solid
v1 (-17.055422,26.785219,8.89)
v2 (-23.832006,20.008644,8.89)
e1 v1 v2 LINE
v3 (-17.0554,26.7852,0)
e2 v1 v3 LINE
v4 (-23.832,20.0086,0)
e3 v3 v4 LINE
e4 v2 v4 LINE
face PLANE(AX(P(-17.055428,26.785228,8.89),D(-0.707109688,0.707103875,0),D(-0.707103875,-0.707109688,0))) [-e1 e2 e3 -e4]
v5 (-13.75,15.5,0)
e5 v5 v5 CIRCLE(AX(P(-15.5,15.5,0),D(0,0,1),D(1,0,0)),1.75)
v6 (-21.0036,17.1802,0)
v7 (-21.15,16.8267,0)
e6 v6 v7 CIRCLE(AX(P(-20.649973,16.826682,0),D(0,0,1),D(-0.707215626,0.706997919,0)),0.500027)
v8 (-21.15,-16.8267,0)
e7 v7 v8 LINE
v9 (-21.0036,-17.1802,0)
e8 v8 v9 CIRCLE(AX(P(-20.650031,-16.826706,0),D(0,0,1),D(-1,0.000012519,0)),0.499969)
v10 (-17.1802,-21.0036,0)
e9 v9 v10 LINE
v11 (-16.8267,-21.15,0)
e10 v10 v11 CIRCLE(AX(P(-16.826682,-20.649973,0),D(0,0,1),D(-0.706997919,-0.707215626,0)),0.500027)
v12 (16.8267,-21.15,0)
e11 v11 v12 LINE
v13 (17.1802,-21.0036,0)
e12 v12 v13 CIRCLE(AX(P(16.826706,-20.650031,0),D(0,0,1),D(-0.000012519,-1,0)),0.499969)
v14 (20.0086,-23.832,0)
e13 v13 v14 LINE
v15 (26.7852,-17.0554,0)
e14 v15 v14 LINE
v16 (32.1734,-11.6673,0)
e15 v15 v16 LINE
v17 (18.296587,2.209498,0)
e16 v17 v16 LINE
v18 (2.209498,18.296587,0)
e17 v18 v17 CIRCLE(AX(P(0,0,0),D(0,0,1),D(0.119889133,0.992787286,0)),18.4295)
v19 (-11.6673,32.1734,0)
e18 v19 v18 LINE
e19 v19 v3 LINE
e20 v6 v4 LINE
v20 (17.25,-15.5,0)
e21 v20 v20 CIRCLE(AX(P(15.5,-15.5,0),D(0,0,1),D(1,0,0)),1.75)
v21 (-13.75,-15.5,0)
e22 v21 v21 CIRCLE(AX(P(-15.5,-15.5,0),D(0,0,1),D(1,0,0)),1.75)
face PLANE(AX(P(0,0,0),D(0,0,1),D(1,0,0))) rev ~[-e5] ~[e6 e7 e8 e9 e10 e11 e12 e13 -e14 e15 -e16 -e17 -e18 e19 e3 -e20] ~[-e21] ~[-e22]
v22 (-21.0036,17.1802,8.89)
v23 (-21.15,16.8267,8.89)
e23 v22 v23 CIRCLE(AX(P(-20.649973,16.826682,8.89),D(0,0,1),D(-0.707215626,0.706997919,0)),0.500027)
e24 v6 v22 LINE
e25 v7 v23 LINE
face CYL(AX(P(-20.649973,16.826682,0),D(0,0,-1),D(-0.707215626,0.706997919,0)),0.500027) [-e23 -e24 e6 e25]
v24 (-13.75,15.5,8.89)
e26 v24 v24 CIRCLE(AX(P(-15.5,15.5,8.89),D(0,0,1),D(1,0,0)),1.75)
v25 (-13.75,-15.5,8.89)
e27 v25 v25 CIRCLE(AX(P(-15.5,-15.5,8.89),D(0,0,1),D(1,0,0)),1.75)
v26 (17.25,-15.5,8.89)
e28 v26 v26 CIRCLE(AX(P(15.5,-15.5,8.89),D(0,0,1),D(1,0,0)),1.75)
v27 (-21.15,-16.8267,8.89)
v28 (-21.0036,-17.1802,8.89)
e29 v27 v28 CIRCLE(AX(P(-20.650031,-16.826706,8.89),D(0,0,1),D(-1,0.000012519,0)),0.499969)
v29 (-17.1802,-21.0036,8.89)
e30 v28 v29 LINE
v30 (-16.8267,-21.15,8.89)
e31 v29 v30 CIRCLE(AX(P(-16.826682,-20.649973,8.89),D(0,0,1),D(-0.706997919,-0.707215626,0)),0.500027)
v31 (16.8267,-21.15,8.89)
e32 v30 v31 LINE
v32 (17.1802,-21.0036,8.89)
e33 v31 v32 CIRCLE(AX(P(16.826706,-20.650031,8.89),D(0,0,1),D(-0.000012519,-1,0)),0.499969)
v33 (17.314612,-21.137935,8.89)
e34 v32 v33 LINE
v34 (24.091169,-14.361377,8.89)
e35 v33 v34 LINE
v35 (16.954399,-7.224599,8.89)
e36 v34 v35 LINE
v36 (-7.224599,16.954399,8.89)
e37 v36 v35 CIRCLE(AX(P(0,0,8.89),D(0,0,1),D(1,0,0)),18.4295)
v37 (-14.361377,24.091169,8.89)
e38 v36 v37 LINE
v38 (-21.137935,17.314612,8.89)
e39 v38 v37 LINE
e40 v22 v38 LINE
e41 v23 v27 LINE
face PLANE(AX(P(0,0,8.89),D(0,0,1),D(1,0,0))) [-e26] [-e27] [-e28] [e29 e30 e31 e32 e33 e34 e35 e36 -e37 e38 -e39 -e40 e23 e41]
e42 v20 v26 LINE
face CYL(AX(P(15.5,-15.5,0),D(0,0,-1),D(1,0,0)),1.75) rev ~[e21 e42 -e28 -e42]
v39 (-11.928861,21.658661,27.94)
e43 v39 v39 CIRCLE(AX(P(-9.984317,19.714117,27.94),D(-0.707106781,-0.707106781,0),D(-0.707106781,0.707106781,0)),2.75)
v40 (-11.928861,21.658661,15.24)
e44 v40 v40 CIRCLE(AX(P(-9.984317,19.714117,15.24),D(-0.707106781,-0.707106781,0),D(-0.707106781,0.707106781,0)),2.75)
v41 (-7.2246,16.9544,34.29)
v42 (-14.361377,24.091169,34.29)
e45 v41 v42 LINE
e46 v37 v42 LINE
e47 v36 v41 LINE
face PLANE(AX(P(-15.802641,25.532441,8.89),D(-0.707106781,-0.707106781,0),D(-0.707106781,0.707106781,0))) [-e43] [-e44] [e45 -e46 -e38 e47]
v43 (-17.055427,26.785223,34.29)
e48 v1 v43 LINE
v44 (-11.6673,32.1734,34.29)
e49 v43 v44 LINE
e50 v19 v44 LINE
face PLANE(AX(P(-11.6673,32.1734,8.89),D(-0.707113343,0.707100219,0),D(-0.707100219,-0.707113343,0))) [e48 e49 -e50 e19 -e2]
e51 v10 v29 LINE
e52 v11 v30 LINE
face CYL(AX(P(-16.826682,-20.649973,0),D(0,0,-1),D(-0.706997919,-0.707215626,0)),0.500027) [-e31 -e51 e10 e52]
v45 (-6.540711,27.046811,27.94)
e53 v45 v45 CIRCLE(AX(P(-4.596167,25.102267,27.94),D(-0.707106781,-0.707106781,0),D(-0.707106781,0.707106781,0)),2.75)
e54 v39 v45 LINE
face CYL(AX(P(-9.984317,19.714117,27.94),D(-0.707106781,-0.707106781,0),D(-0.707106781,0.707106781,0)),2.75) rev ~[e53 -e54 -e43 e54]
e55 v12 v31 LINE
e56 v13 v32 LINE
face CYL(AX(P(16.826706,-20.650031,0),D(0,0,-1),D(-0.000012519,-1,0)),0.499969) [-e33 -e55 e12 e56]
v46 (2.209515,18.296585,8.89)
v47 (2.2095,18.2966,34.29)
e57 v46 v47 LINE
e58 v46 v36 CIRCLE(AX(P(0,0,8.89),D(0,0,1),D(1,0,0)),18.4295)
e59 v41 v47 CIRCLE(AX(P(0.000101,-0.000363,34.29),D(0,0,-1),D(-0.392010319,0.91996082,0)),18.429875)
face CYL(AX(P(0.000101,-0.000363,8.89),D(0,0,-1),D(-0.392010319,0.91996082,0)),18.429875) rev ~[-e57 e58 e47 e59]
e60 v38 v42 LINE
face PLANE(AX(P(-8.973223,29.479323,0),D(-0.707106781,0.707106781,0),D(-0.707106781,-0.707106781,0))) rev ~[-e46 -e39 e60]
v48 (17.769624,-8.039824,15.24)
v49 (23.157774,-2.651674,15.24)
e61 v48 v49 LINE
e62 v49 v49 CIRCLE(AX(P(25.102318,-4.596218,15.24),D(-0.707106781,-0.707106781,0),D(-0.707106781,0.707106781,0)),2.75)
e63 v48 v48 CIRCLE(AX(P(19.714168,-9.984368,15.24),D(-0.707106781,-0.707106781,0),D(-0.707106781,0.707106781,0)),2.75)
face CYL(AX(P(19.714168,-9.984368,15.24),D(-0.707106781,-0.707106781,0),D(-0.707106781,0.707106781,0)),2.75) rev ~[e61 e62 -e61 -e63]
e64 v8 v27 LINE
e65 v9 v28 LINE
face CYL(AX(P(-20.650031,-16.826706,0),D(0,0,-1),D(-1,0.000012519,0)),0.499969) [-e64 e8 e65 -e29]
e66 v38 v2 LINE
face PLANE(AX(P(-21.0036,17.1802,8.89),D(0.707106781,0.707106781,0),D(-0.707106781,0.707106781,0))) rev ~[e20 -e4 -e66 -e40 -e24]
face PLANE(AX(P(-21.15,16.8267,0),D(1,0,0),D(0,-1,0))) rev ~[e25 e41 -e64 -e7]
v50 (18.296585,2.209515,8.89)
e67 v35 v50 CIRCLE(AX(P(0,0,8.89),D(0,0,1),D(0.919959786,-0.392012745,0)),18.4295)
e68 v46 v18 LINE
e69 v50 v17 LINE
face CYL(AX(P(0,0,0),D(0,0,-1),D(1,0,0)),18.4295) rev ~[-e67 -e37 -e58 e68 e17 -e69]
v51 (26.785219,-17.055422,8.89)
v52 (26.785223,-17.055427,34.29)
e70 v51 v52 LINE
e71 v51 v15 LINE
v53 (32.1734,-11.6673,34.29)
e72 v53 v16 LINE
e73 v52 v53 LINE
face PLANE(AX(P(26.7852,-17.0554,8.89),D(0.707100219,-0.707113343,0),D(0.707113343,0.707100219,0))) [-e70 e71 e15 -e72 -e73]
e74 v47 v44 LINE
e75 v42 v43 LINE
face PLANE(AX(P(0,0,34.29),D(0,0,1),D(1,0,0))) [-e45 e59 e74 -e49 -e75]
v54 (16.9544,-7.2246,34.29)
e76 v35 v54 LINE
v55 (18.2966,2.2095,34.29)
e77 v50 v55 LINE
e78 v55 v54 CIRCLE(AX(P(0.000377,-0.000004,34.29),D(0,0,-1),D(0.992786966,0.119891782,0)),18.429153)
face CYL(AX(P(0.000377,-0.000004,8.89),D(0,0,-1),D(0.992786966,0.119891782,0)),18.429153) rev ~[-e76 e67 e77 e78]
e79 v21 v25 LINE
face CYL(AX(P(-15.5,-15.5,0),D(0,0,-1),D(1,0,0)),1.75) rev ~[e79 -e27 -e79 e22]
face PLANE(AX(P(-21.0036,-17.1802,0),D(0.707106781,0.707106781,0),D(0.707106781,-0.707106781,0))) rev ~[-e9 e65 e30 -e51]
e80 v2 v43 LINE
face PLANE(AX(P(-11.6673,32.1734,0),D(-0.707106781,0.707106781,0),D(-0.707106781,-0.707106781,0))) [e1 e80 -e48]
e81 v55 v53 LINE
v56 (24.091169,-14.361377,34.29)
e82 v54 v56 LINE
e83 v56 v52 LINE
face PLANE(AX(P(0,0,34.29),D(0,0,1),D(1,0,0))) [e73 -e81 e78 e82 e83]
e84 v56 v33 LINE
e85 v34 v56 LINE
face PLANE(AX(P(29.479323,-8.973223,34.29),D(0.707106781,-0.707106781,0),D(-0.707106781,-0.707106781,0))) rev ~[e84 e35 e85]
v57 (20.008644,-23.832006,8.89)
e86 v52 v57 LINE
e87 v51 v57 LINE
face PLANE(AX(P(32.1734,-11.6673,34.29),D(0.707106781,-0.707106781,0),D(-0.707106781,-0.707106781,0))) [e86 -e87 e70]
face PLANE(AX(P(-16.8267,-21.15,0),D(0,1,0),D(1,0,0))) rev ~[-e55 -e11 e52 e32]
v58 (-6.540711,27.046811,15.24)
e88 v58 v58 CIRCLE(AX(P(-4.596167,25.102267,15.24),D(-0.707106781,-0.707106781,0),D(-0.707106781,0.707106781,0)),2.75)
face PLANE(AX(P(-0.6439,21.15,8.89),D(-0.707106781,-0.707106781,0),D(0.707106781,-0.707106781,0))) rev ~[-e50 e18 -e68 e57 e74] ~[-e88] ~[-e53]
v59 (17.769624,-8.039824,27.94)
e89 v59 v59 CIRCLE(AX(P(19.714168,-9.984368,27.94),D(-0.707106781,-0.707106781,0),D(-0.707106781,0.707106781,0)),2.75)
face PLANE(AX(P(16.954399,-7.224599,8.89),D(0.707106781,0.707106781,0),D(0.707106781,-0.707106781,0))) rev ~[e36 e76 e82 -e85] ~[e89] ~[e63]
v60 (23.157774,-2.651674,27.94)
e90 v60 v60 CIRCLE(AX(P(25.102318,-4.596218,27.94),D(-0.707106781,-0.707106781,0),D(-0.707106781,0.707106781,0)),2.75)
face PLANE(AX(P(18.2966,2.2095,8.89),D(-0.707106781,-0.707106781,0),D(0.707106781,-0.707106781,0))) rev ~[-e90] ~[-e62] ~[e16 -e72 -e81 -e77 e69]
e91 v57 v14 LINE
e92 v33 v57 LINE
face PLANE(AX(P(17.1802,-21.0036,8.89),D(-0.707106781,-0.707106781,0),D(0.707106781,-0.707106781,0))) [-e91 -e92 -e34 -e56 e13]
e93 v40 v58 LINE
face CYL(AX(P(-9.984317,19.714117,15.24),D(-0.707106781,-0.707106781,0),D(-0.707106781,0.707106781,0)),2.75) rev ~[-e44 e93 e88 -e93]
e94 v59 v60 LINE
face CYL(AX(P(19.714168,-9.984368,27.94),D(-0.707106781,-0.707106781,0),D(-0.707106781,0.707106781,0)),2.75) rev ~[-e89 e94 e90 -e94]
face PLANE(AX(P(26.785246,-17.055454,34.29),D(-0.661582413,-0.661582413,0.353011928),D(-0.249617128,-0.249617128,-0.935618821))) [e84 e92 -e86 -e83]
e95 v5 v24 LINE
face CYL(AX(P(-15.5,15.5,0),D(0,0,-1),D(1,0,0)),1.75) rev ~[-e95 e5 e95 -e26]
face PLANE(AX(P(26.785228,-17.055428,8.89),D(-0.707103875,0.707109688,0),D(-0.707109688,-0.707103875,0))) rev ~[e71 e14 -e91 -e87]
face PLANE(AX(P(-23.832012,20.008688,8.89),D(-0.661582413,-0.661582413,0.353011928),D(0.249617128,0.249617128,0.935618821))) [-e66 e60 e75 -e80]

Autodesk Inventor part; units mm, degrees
ref_plane "YZ Plane" through (0, 0, 0) normal (1, 0, 0) x (0, 1, 0)
ref_plane "XZ Plane" through (0, 0, 0) normal (0, 1, 0) x (-1, 0, 0)
ref_plane "XY Plane" through (0, 0, 0) normal (0, 0, 1) x (1, 0, 0)
sketch "Sketch1" plane through (0, 0, 0) normal (0, 0, 1) x (1, 0, 0)
  line L0 (-21.15, 16.8267) -> (-21.15, -16.8267) projected
  arc A0 (-21.15, -16.8267) -> (-21.0036, -17.1802) centre (-20.65, -16.8267) ccw projected
  line L1 (-21.0036, -17.1802) -> (-17.1802, -21.0036) projected
  arc A1 (-17.1802, -21.0036) -> (-16.8267, -21.15) centre (-16.8267, -20.65) ccw projected
  line L2 (-16.8267, -21.15) -> (16.8267, -21.15) projected
  arc A2 (16.8267, -21.15) -> (17.1802, -21.0036) centre (16.8267, -20.65) ccw projected
  line L3 (17.1802, -21.0036) -> (21.0036, -17.1802) projected
  arc A3 (21.0036, -17.1802) -> (21.15, -16.8267) centre (20.65, -16.8267) ccw projected
  line L4 (21.15, -16.8267) -> (21.15, 16.8267) projected
  arc A4 (21.15, 16.8267) -> (21.0036, 17.1802) centre (20.65, 16.8267) ccw projected
  line L5 (21.0036, 17.1802) -> (17.1802, 21.0036) projected
  arc A5 (17.1802, 21.0036) -> (16.8267, 21.15) centre (16.8267, 20.65) ccw projected
  line L6 (16.8267, 21.15) -> (-16.8267, 21.15) projected
  arc A6 (-16.8267, 21.15) -> (-17.1802, 21.0036) centre (-16.8267, 20.65) ccw projected
  line L7 (-17.1802, 21.0036) -> (-21.0036, 17.1802) projected
  arc A7 (-21.0036, 17.1802) -> (-21.15, 16.8267) centre (-20.65, 16.8267) ccw projected
  circle A8 centre (-15.5, -15.5) radius 1.75 projected
  circle A9 centre (-15.5, 15.5) radius 1.75 projected
  circle A10 centre (15.5, 15.5) radius 1.75 projected
  circle A11 centre (15.5, -15.5) radius 1.75 projected
  circle A12 centre (0, 0) radius 17 projected
  circle A13 centre (0, 0) radius 18.4295
extrude "Extrusion1" add sketch "Sketch1" along normal blind 8.89 contours A7 L7 A6 L6 A5 L5 A4 L4 A3 L3 A2 L2 A1 L1 A0 L0
sketch "Sketch2" plane through (0, 0, 8.89) normal (0, 0, 1) x (1, 0, 0)
  circle A0 centre (0, 0) radius 18.4295 projected
  circle A1 centre (15.5, -15.5) radius 1.75 projected
  circle A2 centre (15.5, 15.5) radius 1.75 projected
  circle A3 centre (-15.5, 15.5) radius 1.75 projected
  circle A4 centre (-15.5, -15.5) radius 1.75 projected
  line L0 (-21.15, 16.8267) -> (-21.15, -16.8267) projected
  arc A5 (-21.15, -16.8267) -> (-21.0036, -17.1802) centre (-20.65, -16.8267) ccw projected
  line L1 (-21.0036, -17.1802) -> (-17.1802, -21.0036) projected
  arc A6 (-17.1802, -21.0036) -> (-16.8267, -21.15) centre (-16.8267, -20.65) ccw projected
  line L2 (-16.8267, -21.15) -> (16.8267, -21.15) projected
  arc A7 (16.8267, -21.15) -> (17.1802, -21.0036) centre (16.8267, -20.65) ccw projected
  line L3 (17.1802, -21.0036) -> (21.0036, -17.1802) projected
  arc A8 (21.0036, -17.1802) -> (21.15, -16.8267) centre (20.65, -16.8267) ccw projected
  line L4 (21.15, -16.8267) -> (21.15, 16.8267) projected
  arc A9 (21.15, 16.8267) -> (21.0036, 17.1802) centre (20.65, 16.8267) ccw projected
  line L5 (21.0036, 17.1802) -> (17.1802, 21.0036) projected
  arc A10 (17.1802, 21.0036) -> (16.8267, 21.15) centre (16.8267, 20.65) ccw projected
  line L6 (16.8267, 21.15) -> (-16.8267, 21.15) projected
  arc A11 (-16.8267, 21.15) -> (-17.1802, 21.0036) centre (-16.8267, 20.65) ccw projected
  line L7 (-17.1802, 21.0036) -> (-21.0036, 17.1802) projected
  arc A12 (-21.0036, 17.1802) -> (-21.15, 16.8267) centre (-20.65, 16.8267) ccw projected
  arc A13 (15.7331, 31.2895) -> (15.7331, 33.0572) centre (14.8492, 32.1734) ccw projected
  line L8 (15.7331, 33.0572) -> (12.0915, 36.6988) projected
  line L9 (12.0915, 36.6988) -> (11.3844, 36.6988) projected
  line L10 (11.3844, 36.6988) -> (10.6066, 35.921) projected
  line L11 (10.6066, 35.921) -> (12.3037, 34.224) projected
  line L12 (12.3037, 34.224) -> (10.9361, 32.8564) projected
  line L13 (10.9361, 32.8564) -> (7.5901, 32.8564) projected
  line L14 (7.5901, 32.8564) -> (3.1579, 37.2886) projected
  line L15 (3.1579, 37.2886) -> (3.1579, 40.6346) projected
  line L16 (3.1579, 40.6346) -> (4.5255, 42.0021) projected
  line L17 (4.5255, 42.0021) -> (6.2225, 40.3051) projected
  line L18 (6.2225, 40.3051) -> (7.0004, 41.0829) projected
  line L19 (7.0004, 41.0829) -> (7.0004, 41.79) projected
  line L20 (7.0004, 41.79) -> (3.3588, 45.4316) projected
  arc A14 (3.3588, 45.4316) -> (1.591, 45.4316) centre (2.4749, 44.5477) ccw projected
  line L21 (1.591, 45.4316) -> (-2.0506, 41.79) projected
  line L22 (-2.0506, 41.79) -> (-2.0506, 41.0829) projected
  line L23 (-2.0506, 41.0829) -> (-1.2728, 40.3051) projected
  line L24 (-1.2728, 40.3051) -> (0.4243, 42.0021) projected
  line L25 (0.4243, 42.0021) -> (1.7918, 40.6346) projected
  line L26 (1.7918, 40.6346) -> (1.7918, 37.2886) projected
  line L27 (1.7918, 37.2886) -> (-2.6403, 32.8564) projected
  line L28 (-2.6403, 32.8564) -> (-5.9864, 32.8564) projected
  line L29 (-5.9864, 32.8564) -> (-7.3539, 34.224) projected
  line L30 (-7.3539, 34.224) -> (-5.6569, 35.921) projected
  line L31 (-5.6569, 35.921) -> (-6.4347, 36.6988) projected
  line L32 (-6.4347, 36.6988) -> (-7.1418, 36.6988) projected
  line L33 (-7.1418, 36.6988) -> (-10.7834, 33.0572) projected
  arc A15 (-10.7834, 33.0572) -> (-10.7834, 31.2895) centre (-9.8995, 32.1734) ccw projected
  line L34 (-10.7834, 31.2895) -> (-7.1418, 27.6479) projected
  line L35 (-7.1418, 27.6479) -> (-6.4347, 27.6479) projected
  line L36 (-6.4347, 27.6479) -> (-5.6569, 28.4257) projected
  line L37 (-5.6569, 28.4257) -> (-7.3539, 30.1228) projected
  line L38 (-7.3539, 30.1228) -> (-5.9864, 31.4903) projected
  line L39 (-5.9864, 31.4903) -> (-2.6403, 31.4903) projected
  line L40 (-2.6403, 31.4903) -> (1.7918, 27.0582) projected
  line L41 (1.7918, 27.0582) -> (1.7918, 23.7121) projected
  line L42 (1.7918, 23.7121) -> (0.4243, 22.3446) projected
  line L43 (0.4243, 22.3446) -> (-1.2728, 24.0416) projected
  line L44 (-1.2728, 24.0416) -> (-2.0506, 23.2638) projected
  line L45 (-2.0506, 23.2638) -> (-2.0506, 22.5567) projected
  line L46 (-2.0506, 22.5567) -> (1.591, 18.9151) projected
  arc A16 (1.591, 18.9151) -> (3.3588, 18.9151) centre (2.4749, 19.799) ccw projected
  line L47 (3.3588, 18.9151) -> (7.0004, 22.5567) projected
  line L48 (7.0004, 22.5567) -> (7.0004, 23.2638) projected
  line L49 (7.0004, 23.2638) -> (6.2225, 24.0416) projected
  line L50 (6.2225, 24.0416) -> (4.5255, 22.3446) projected
  line L51 (4.5255, 22.3446) -> (3.1579, 23.7121) projected
  line L52 (3.1579, 23.7121) -> (3.1579, 27.0582) projected
  line L53 (3.1579, 27.0582) -> (7.5901, 31.4903) projected
  line L54 (7.5901, 31.4903) -> (10.9361, 31.4903) projected
  line L55 (10.9361, 31.4903) -> (12.3037, 30.1228) projected
  line L56 (12.3037, 30.1228) -> (10.6066, 28.4257) projected
  line L57 (10.6066, 28.4257) -> (11.3844, 27.6479) projected
  line L58 (11.3844, 27.6479) -> (12.0915, 27.6479) projected
  line L59 (12.0915, 27.6479) -> (15.7331, 31.2895) projected
  circle A17 centre (2.4749, 32.1734) radius 2.5 projected
  arc A18 (45.4316, 1.591) -> (45.4316, 3.3588) centre (44.5477, 2.4749) ccw projected
  line L60 (45.4316, 3.3588) -> (41.79, 7.0004) projected
  line L61 (41.79, 7.0004) -> (41.0829, 7.0004) projected
  line L62 (41.0829, 7.0004) -> (40.3051, 6.2225) projected
  line L63 (40.3051, 6.2225) -> (42.0021, 4.5255) projected
  line L64 (42.0021, 4.5255) -> (40.6346, 3.158) projected
  line L65 (40.6346, 3.158) -> (37.2886, 3.158) projected
  line L66 (37.2886, 3.158) -> (32.8564, 7.5901) projected
  line L67 (32.8564, 7.5901) -> (32.8564, 10.9361) projected
  line L68 (32.8564, 10.9361) -> (34.224, 12.3037) projected
  line L69 (34.224, 12.3037) -> (35.921, 10.6066) projected
  line L70 (35.921, 10.6066) -> (36.6988, 11.3844) projected
  line L71 (36.6988, 11.3844) -> (36.6988, 12.0915) projected
  line L72 (36.6988, 12.0915) -> (33.0572, 15.7331) projected
  arc A19 (33.0572, 15.7331) -> (31.2895, 15.7331) centre (32.1734, 14.8492) ccw projected
  line L73 (31.2895, 15.7331) -> (27.6479, 12.0915) projected
  line L74 (27.6479, 12.0915) -> (27.6479, 11.3844) projected
  line L75 (27.6479, 11.3844) -> (28.4257, 10.6066) projected
  line L76 (28.4257, 10.6066) -> (30.1227, 12.3037) projected
  line L77 (30.1227, 12.3037) -> (31.4903, 10.9361) projected
  line L78 (31.4903, 10.9361) -> (31.4903, 7.5901) projected
  line L79 (31.4903, 7.5901) -> (27.0582, 3.158) projected
  line L80 (27.0582, 3.158) -> (23.7121, 3.158) projected
  line L81 (23.7121, 3.158) -> (22.3446, 4.5255) projected
  line L82 (22.3446, 4.5255) -> (24.0416, 6.2225) projected
  line L83 (24.0416, 6.2225) -> (23.2638, 7.0004) projected
  line L84 (23.2638, 7.0004) -> (22.5567, 7.0004) projected
  line L85 (22.5567, 7.0004) -> (18.9151, 3.3588) projected
  arc A20 (18.9151, 3.3588) -> (18.9151, 1.591) centre (19.799, 2.4749) ccw projected
  line L86 (18.9151, 1.591) -> (22.5567, -2.0506) projected
  line L87 (22.5567, -2.0506) -> (23.2638, -2.0506) projected
  line L88 (23.2638, -2.0506) -> (24.0416, -1.2728) projected
  line L89 (24.0416, -1.2728) -> (22.3446, 0.4243) projected
  line L90 (22.3446, 0.4243) -> (23.7121, 1.7918) projected
  line L91 (23.7121, 1.7918) -> (27.0582, 1.7918) projected
  line L92 (27.0582, 1.7918) -> (31.4903, -2.6403) projected
  line L93 (31.4903, -2.6403) -> (31.4903, -5.9864) projected
  line L94 (31.4903, -5.9864) -> (30.1227, -7.3539) projected
  line L95 (30.1227, -7.3539) -> (28.4257, -5.6569) projected
  line L96 (28.4257, -5.6569) -> (27.6479, -6.4347) projected
  line L97 (27.6479, -6.4347) -> (27.6479, -7.1418) projected
  line L98 (27.6479, -7.1418) -> (31.2895, -10.7834) projected
  arc A21 (31.2895, -10.7834) -> (33.0572, -10.7834) centre (32.1734, -9.8995) ccw projected
  line L99 (33.0572, -10.7834) -> (36.6988, -7.1418) projected
  line L100 (36.6988, -7.1418) -> (36.6988, -6.4347) projected
  line L101 (36.6988, -6.4347) -> (35.921, -5.6569) projected
  line L102 (35.921, -5.6569) -> (34.224, -7.3539) projected
  line L103 (34.224, -7.3539) -> (32.8564, -5.9864) projected
  line L104 (32.8564, -5.9864) -> (32.8564, -2.6403) projected
  line L105 (32.8564, -2.6403) -> (37.2886, 1.7918) projected
  line L106 (37.2886, 1.7918) -> (40.6346, 1.7918) projected
  line L107 (40.6346, 1.7918) -> (42.0021, 0.4243) projected
  line L108 (42.0021, 0.4243) -> (40.3051, -1.2728) projected
  line L109 (40.3051, -1.2728) -> (41.0829, -2.0506) projected
  line L110 (41.0829, -2.0506) -> (41.79, -2.0506) projected
  line L111 (41.79, -2.0506) -> (45.4316, 1.591) projected
  circle A22 centre (32.1734, 2.4749) radius 2.5 projected
  line L112 (0, 0) -> (0, 42.5275)
  line L113 (17.1802, -21.0036) -> (21.0036, -17.1802) projected
  line L114 (17.1802, -21.0036) -> (32.1734, -11.6673)
  line L115 (32.1734, -11.6673) -> (21.15, -0.6439)
  line L116 (21.15, -16.8267) -> (21.15, 16.8267) projected
  line L117 (21.15, -0.6439) -> (17.1802, -21.0036)
  line L118 (0, 0) -> (48.328, 48.328)
  line L119 (-21.0036, 17.1802) -> (-11.6673, 32.1734)
  line L120 (-11.6673, 32.1734) -> (-0.6439, 21.15)
  line L121 (-0.6439, 21.15) -> (-21.0036, 17.1802)
extrude "Extrusion2" add sketch "Sketch2" against normal up to surface (8.89 mm away) contours L121 L7 A11 L6 | L6 A11 L7 L119 L120 L34 L46 | L86 L115 L98 L114 L3 A8 L4 | L4 A8 L3 L117
sketch "Sketch3" plane through (0, 0, 8.89) normal (0, 0, 1) x (1, 0, 0)
  arc A0 (-21.0036, 17.1802) -> (-21.15, 16.8267) centre (-20.65, 16.8267) ccw projected
  line L0 (-21.15, 16.8267) -> (-21.15, -16.8267) projected
  arc A1 (-21.15, -16.8267) -> (-21.0036, -17.1802) centre (-20.65, -16.8267) ccw projected
  line L1 (-21.0036, -17.1802) -> (-17.1802, -21.0036) projected
  arc A2 (-17.1802, -21.0036) -> (-16.8267, -21.15) centre (-16.8267, -20.65) ccw projected
  line L2 (-16.8267, -21.15) -> (16.8267, -21.15) projected
  arc A3 (16.8267, -21.15) -> (17.1802, -21.0036) centre (16.8267, -20.65) ccw projected
  line L3 (17.1802, -21.0036) -> (32.1734, -11.6673) projected
  line L4 (32.1734, -11.6673) -> (21.15, -0.6439) projected
  line L5 (21.15, -0.6439) -> (21.15, 16.8267) projected
  arc A4 (21.15, 16.8267) -> (21.0036, 17.1802) centre (20.65, 16.8267) ccw projected
  line L6 (21.0036, 17.1802) -> (17.1802, 21.0036) projected
  arc A5 (17.1802, 21.0036) -> (16.8267, 21.15) centre (16.8267, 20.65) ccw projected
  line L7 (16.8267, 21.15) -> (-0.6439, 21.15) projected
  line L8 (-0.6439, 21.15) -> (-11.6673, 32.1734) projected
  line L9 (-11.6673, 32.1734) -> (-21.0036, 17.1802) projected
  circle A6 centre (0, 0) radius 18.4295 projected
  circle A7 centre (15.5, -15.5) radius 1.75 projected
  circle A8 centre (15.5, 15.5) radius 1.75 projected
  circle A9 centre (-15.5, 15.5) radius 1.75 projected
  circle A10 centre (-15.5, -15.5) radius 1.75 projected
  line L10 (21.15, -0.6439) -> (32.1734, -11.6673) projected
  line L11 (32.1734, -11.6673) -> (18.0312, 2.4749)
  line L12 (18.0312, 2.4749) -> (12.6431, -2.9133)
  line L13 (12.6431, -2.9133) -> (26.7852, -17.0554)
  line L14 (26.7852, -17.0554) -> (32.1734, -11.6673)
  line L15 (0, 0) -> (-64.6298, -64.6298)
  line L16 (-11.6673, 32.1734) -> (-0.6439, 21.15)
  line L17 (-0.6439, 21.15) -> (-11.6673, 32.1734)
  line L18 (-11.6673, 32.1734) -> (2.4749, 18.0312)
  line L19 (2.4749, 18.0312) -> (-2.9133, 12.6431)
  line L20 (-2.9133, 12.6431) -> (-17.0554, 26.7852)
  line L21 (-17.0554, 26.7852) -> (-11.6673, 32.1734)
  dimension "d5" = 7.62
  dimension "d6" = 20
extrude "Extrusion3" add sketch "Sketch3" along normal blind 25.4 contours L20 L21 L9 | L9 L8 L18 A6 L20 | A6 L18 L19 L20 | L11 L4 L3 L13 A6 | A6 L13 L12 L11 | L3 L14 L13
sketch "Sketch4" plane through (0, 0, 8.89) normal (0, 0, 1) x (1, 0, 0)
  line L0 (-7.2246, 16.9544) -> (-15.8026, 25.5324) projected
  line L1 (-15.8026, 25.5324) -> (-21.0036, 17.1802) projected
  arc A0 (-21.0036, 17.1802) -> (-21.15, 16.8267) centre (-20.65, 16.8267) ccw projected
  line L2 (-21.15, 16.8267) -> (-21.15, -16.8267) projected
  arc A1 (-21.15, -16.8267) -> (-21.0036, -17.1802) centre (-20.65, -16.8267) ccw projected
  line L3 (-21.0036, -17.1802) -> (-17.1802, -21.0036) projected
  arc A2 (-17.1802, -21.0036) -> (-16.8267, -21.15) centre (-16.8267, -20.65) ccw projected
  line L4 (-16.8267, -21.15) -> (16.8267, -21.15) projected
  arc A3 (16.8267, -21.15) -> (17.1802, -21.0036) centre (16.8267, -20.65) ccw projected
  line L5 (17.1802, -21.0036) -> (25.5324, -15.8026) projected
  line L6 (25.5324, -15.8026) -> (16.9544, -7.2246) projected
  arc A4 (-7.2246, 16.9544) -> (16.9544, -7.2246) centre (0, 0) ccw projected
  circle A5 centre (15.5, -15.5) radius 1.75 projected
  circle A6 centre (-15.5, 15.5) radius 1.75 projected
  circle A7 centre (-15.5, -15.5) radius 1.75 projected
  line L7 (25.5324, -15.8026) -> (32.1734, -11.6673) projected
  line L8 (32.1734, -11.6673) -> (18.0312, 2.4749) projected
  line L9 (18.0312, 2.4749) -> (12.6431, -2.9133) projected
  line L10 (12.6431, -2.9133) -> (26.7852, -17.0554) projected
  line L11 (26.7852, -17.0554) -> (32.1734, -11.6673) projected
  line L12 (-11.6673, 32.1734) -> (-17.0554, 26.7852) projected
  line L13 (-17.0554, 26.7852) -> (-2.9133, 12.6431) projected
  line L14 (-2.9133, 12.6431) -> (2.4749, 18.0312) projected
  line L15 (2.4749, 18.0312) -> (-11.6673, 32.1734) projected
  line L16 (17.1802, -21.0036) -> (20.0086, -23.832)
  line L17 (21.15, -0.6439) -> (32.1734, -11.6673) projected
  line L18 (32.1734, -11.6673) -> (20.0086, -23.832)
  line L19 (32.1734, -11.6673) -> (17.1802, -21.0036) projected
  line L20 (17.1802, -21.0036) -> (32.1734, -11.6673)
  line L21 (0, 0) -> (-37.9127, -37.9127)
  arc A8 (-21.0036, 17.1802) -> (-21.15, 16.8267) centre (-20.65, 16.8267) ccw
  line L22 (-21.0036, 17.1802) -> (-15.8026, 25.5324)
  line L23 (-15.8026, 25.5324) -> (-11.6673, 32.1734)
  line L24 (-17.0554, 26.7852) -> (-11.6673, 32.1734)
  line L25 (-21.0036, 17.1802) -> (-23.832, 20.0086)
  line L26 (-11.6673, 32.1734) -> (-23.832, 20.0086)
  line L27 (-11.6673, 32.1734) -> (-21.0036, 17.1802)
  line L28 (-21.0036, 17.1802) -> (-11.6673, 32.1734)
extrude "Extrusion4" add sketch "Sketch4" against normal up to surface (8.89 mm away) contours L1 L25 L26 L13 | L13 L12 L23 | L10 L18 L16 L5 | L7 L11 L10
sketch "Sketch5" plane through (0, 0, 8.89) normal (0, 0, 1) x (1, 0, 0)
  circle A0 centre (15.5, 15.5) radius 1.75 projected
  line L0 (-0.6439, 21.15) -> (2.2095, 18.2966) projected
  arc A1 (18.2966, 2.2095) -> (2.2095, 18.2966) centre (0, 0) ccw projected
  line L1 (18.2966, 2.2095) -> (21.15, -0.6439) projected
  line L2 (21.15, -0.6439) -> (21.15, 16.8267) projected
  arc A2 (21.15, 16.8267) -> (21.0036, 17.1802) centre (20.65, 16.8267) ccw projected
  line L3 (21.0036, 17.1802) -> (17.1802, 21.0036) projected
  arc A3 (17.1802, 21.0036) -> (16.8267, 21.15) centre (16.8267, 20.65) ccw projected
  line L4 (16.8267, 21.15) -> (-0.6439, 21.15) projected
extrude "Extrusion5" cut sketch "Sketch5" against normal blind 25.4
sketch "Sketch6" plane through (32.1734, -11.6673, 34.29) normal (0.7071068, -0.7071068, 0) x (-0.7071068, -0.7071068, 0)
  line L0 (0, 34.29) -> (0, 0) projected
  line L1 (7.62, 0) -> (0, 0) projected
  line L2 (7.62, 25.4) -> (7.62, 0) projected
  line L3 (17.2035, 25.4) -> (7.62, 25.4) projected
  line L4 (17.2035, 25.4) -> (17.2035, 34.29) projected
  line L5 (0, 34.29) -> (17.2035, 34.29) projected
  line L6 (7.62, 25.4) -> (7.62, 0) projected
  line L7 (7.62, 0) -> (17.2035, 25.4)
  line L8 (32.9295, 25.4) -> (7.62, 25.4) projected
  line L9 (17.2035, 25.4) -> (7.62, 25.4)
  line L10 (0, 0) -> (7.62, 0) projected
  line L11 (7.62, 25.4) -> (7.62, 0)
  point P0 (14.5, 34.29)
extrude "Extrusion6" add sketch "Sketch6" against normal blind 3.81 contours L2 L3 L7
sketch "Sketch7" plane through (-11.6673, 32.1734, 0) normal (-0.7071068, 0.7071068, 0) x (-0.7071068, -0.7071068, 0)
  line L0 (17.2035, 8.89) -> (7.62, 34.29) projected
  line L1 (7.62, 8.89) -> (7.62, 34.29) projected
  line L2 (17.2035, 8.89) -> (7.62, 8.89) projected
  point P0 (14.5, 0)
extrude "Extrusion7" add sketch "Sketch7" against normal blind 3.81
sketch "Sketch8" plane through (12.6431, -2.9133, 34.29) normal (-0.7071068, -0.7071068, 0) x (-0.7071068, 0.7071068, 0)
  line L0 (-20, 0) -> (-20, 25.4) projected
  line L1 (0, 25.4) -> (0, 0) projected
  line L2 (22, 25.4) -> (22, 0) projected
  line L3 (42, 25.4) -> (42, 0) projected
  line L4 (22, 12.7) -> (42, 12.7) construction
  line L5 (42, 34.29) -> (42, 0) projected
  line L6 (-20, 12.7) -> (0, 12.7) construction
  line L7 (-10, 12.7) -> (-10, 0) construction
  line L8 (-20, 0) -> (0, 0) projected
  line L9 (32, 12.7) -> (32, 0) construction
  line L10 (22, 0) -> (42, 0) projected
  line L11 (32, 12.7) -> (32, 25.4) construction
  line L12 (31.1703, 34.29) -> (31.1703, 25.4) projected
  line L13 (-10, 12.7) -> (-10, 25.4) construction
  circle A0 centre (-10, 19.05) radius 2.75
  circle A1 centre (-10, 6.35) radius 2.75
  circle A2 centre (32, 6.35) radius 2.75
  circle A3 centre (32, 19.05) radius 2.75
  point P0 (11, 34.29)
  dimension "d17" = 5.5
extrude "Extrusion8" cut sketch "Sketch8" against normal through all
sketch "Sketch9" plane through (0, 0, 8.89) normal (0, 0, -1) x (-1, 0, 0)
  arc A0 (-18.2966, 2.2095) -> (-16.9544, -7.2246) centre (0, 0) ccw projected
  line L0 (-12.6431, -2.9133) -> (-16.9544, -7.2246) projected
  line L1 (-18.0312, 2.4749) -> (-12.6431, -2.9133) projected
  line L2 (-18.2966, 2.2095) -> (-18.0312, 2.4749) projected
  arc A1 (7.2246, 16.9544) -> (-2.2095, 18.2966) centre (0, 0) ccw projected
  line L3 (-2.4749, 18.0312) -> (-2.2095, 18.2966) projected
  line L4 (2.9133, 12.6431) -> (-2.4749, 18.0312) projected
  line L5 (7.2246, 16.9544) -> (2.9133, 12.6431) projected
extrude "Extrusion9" cut sketch "Sketch9" against normal through all
properties part number "ZHolder"
